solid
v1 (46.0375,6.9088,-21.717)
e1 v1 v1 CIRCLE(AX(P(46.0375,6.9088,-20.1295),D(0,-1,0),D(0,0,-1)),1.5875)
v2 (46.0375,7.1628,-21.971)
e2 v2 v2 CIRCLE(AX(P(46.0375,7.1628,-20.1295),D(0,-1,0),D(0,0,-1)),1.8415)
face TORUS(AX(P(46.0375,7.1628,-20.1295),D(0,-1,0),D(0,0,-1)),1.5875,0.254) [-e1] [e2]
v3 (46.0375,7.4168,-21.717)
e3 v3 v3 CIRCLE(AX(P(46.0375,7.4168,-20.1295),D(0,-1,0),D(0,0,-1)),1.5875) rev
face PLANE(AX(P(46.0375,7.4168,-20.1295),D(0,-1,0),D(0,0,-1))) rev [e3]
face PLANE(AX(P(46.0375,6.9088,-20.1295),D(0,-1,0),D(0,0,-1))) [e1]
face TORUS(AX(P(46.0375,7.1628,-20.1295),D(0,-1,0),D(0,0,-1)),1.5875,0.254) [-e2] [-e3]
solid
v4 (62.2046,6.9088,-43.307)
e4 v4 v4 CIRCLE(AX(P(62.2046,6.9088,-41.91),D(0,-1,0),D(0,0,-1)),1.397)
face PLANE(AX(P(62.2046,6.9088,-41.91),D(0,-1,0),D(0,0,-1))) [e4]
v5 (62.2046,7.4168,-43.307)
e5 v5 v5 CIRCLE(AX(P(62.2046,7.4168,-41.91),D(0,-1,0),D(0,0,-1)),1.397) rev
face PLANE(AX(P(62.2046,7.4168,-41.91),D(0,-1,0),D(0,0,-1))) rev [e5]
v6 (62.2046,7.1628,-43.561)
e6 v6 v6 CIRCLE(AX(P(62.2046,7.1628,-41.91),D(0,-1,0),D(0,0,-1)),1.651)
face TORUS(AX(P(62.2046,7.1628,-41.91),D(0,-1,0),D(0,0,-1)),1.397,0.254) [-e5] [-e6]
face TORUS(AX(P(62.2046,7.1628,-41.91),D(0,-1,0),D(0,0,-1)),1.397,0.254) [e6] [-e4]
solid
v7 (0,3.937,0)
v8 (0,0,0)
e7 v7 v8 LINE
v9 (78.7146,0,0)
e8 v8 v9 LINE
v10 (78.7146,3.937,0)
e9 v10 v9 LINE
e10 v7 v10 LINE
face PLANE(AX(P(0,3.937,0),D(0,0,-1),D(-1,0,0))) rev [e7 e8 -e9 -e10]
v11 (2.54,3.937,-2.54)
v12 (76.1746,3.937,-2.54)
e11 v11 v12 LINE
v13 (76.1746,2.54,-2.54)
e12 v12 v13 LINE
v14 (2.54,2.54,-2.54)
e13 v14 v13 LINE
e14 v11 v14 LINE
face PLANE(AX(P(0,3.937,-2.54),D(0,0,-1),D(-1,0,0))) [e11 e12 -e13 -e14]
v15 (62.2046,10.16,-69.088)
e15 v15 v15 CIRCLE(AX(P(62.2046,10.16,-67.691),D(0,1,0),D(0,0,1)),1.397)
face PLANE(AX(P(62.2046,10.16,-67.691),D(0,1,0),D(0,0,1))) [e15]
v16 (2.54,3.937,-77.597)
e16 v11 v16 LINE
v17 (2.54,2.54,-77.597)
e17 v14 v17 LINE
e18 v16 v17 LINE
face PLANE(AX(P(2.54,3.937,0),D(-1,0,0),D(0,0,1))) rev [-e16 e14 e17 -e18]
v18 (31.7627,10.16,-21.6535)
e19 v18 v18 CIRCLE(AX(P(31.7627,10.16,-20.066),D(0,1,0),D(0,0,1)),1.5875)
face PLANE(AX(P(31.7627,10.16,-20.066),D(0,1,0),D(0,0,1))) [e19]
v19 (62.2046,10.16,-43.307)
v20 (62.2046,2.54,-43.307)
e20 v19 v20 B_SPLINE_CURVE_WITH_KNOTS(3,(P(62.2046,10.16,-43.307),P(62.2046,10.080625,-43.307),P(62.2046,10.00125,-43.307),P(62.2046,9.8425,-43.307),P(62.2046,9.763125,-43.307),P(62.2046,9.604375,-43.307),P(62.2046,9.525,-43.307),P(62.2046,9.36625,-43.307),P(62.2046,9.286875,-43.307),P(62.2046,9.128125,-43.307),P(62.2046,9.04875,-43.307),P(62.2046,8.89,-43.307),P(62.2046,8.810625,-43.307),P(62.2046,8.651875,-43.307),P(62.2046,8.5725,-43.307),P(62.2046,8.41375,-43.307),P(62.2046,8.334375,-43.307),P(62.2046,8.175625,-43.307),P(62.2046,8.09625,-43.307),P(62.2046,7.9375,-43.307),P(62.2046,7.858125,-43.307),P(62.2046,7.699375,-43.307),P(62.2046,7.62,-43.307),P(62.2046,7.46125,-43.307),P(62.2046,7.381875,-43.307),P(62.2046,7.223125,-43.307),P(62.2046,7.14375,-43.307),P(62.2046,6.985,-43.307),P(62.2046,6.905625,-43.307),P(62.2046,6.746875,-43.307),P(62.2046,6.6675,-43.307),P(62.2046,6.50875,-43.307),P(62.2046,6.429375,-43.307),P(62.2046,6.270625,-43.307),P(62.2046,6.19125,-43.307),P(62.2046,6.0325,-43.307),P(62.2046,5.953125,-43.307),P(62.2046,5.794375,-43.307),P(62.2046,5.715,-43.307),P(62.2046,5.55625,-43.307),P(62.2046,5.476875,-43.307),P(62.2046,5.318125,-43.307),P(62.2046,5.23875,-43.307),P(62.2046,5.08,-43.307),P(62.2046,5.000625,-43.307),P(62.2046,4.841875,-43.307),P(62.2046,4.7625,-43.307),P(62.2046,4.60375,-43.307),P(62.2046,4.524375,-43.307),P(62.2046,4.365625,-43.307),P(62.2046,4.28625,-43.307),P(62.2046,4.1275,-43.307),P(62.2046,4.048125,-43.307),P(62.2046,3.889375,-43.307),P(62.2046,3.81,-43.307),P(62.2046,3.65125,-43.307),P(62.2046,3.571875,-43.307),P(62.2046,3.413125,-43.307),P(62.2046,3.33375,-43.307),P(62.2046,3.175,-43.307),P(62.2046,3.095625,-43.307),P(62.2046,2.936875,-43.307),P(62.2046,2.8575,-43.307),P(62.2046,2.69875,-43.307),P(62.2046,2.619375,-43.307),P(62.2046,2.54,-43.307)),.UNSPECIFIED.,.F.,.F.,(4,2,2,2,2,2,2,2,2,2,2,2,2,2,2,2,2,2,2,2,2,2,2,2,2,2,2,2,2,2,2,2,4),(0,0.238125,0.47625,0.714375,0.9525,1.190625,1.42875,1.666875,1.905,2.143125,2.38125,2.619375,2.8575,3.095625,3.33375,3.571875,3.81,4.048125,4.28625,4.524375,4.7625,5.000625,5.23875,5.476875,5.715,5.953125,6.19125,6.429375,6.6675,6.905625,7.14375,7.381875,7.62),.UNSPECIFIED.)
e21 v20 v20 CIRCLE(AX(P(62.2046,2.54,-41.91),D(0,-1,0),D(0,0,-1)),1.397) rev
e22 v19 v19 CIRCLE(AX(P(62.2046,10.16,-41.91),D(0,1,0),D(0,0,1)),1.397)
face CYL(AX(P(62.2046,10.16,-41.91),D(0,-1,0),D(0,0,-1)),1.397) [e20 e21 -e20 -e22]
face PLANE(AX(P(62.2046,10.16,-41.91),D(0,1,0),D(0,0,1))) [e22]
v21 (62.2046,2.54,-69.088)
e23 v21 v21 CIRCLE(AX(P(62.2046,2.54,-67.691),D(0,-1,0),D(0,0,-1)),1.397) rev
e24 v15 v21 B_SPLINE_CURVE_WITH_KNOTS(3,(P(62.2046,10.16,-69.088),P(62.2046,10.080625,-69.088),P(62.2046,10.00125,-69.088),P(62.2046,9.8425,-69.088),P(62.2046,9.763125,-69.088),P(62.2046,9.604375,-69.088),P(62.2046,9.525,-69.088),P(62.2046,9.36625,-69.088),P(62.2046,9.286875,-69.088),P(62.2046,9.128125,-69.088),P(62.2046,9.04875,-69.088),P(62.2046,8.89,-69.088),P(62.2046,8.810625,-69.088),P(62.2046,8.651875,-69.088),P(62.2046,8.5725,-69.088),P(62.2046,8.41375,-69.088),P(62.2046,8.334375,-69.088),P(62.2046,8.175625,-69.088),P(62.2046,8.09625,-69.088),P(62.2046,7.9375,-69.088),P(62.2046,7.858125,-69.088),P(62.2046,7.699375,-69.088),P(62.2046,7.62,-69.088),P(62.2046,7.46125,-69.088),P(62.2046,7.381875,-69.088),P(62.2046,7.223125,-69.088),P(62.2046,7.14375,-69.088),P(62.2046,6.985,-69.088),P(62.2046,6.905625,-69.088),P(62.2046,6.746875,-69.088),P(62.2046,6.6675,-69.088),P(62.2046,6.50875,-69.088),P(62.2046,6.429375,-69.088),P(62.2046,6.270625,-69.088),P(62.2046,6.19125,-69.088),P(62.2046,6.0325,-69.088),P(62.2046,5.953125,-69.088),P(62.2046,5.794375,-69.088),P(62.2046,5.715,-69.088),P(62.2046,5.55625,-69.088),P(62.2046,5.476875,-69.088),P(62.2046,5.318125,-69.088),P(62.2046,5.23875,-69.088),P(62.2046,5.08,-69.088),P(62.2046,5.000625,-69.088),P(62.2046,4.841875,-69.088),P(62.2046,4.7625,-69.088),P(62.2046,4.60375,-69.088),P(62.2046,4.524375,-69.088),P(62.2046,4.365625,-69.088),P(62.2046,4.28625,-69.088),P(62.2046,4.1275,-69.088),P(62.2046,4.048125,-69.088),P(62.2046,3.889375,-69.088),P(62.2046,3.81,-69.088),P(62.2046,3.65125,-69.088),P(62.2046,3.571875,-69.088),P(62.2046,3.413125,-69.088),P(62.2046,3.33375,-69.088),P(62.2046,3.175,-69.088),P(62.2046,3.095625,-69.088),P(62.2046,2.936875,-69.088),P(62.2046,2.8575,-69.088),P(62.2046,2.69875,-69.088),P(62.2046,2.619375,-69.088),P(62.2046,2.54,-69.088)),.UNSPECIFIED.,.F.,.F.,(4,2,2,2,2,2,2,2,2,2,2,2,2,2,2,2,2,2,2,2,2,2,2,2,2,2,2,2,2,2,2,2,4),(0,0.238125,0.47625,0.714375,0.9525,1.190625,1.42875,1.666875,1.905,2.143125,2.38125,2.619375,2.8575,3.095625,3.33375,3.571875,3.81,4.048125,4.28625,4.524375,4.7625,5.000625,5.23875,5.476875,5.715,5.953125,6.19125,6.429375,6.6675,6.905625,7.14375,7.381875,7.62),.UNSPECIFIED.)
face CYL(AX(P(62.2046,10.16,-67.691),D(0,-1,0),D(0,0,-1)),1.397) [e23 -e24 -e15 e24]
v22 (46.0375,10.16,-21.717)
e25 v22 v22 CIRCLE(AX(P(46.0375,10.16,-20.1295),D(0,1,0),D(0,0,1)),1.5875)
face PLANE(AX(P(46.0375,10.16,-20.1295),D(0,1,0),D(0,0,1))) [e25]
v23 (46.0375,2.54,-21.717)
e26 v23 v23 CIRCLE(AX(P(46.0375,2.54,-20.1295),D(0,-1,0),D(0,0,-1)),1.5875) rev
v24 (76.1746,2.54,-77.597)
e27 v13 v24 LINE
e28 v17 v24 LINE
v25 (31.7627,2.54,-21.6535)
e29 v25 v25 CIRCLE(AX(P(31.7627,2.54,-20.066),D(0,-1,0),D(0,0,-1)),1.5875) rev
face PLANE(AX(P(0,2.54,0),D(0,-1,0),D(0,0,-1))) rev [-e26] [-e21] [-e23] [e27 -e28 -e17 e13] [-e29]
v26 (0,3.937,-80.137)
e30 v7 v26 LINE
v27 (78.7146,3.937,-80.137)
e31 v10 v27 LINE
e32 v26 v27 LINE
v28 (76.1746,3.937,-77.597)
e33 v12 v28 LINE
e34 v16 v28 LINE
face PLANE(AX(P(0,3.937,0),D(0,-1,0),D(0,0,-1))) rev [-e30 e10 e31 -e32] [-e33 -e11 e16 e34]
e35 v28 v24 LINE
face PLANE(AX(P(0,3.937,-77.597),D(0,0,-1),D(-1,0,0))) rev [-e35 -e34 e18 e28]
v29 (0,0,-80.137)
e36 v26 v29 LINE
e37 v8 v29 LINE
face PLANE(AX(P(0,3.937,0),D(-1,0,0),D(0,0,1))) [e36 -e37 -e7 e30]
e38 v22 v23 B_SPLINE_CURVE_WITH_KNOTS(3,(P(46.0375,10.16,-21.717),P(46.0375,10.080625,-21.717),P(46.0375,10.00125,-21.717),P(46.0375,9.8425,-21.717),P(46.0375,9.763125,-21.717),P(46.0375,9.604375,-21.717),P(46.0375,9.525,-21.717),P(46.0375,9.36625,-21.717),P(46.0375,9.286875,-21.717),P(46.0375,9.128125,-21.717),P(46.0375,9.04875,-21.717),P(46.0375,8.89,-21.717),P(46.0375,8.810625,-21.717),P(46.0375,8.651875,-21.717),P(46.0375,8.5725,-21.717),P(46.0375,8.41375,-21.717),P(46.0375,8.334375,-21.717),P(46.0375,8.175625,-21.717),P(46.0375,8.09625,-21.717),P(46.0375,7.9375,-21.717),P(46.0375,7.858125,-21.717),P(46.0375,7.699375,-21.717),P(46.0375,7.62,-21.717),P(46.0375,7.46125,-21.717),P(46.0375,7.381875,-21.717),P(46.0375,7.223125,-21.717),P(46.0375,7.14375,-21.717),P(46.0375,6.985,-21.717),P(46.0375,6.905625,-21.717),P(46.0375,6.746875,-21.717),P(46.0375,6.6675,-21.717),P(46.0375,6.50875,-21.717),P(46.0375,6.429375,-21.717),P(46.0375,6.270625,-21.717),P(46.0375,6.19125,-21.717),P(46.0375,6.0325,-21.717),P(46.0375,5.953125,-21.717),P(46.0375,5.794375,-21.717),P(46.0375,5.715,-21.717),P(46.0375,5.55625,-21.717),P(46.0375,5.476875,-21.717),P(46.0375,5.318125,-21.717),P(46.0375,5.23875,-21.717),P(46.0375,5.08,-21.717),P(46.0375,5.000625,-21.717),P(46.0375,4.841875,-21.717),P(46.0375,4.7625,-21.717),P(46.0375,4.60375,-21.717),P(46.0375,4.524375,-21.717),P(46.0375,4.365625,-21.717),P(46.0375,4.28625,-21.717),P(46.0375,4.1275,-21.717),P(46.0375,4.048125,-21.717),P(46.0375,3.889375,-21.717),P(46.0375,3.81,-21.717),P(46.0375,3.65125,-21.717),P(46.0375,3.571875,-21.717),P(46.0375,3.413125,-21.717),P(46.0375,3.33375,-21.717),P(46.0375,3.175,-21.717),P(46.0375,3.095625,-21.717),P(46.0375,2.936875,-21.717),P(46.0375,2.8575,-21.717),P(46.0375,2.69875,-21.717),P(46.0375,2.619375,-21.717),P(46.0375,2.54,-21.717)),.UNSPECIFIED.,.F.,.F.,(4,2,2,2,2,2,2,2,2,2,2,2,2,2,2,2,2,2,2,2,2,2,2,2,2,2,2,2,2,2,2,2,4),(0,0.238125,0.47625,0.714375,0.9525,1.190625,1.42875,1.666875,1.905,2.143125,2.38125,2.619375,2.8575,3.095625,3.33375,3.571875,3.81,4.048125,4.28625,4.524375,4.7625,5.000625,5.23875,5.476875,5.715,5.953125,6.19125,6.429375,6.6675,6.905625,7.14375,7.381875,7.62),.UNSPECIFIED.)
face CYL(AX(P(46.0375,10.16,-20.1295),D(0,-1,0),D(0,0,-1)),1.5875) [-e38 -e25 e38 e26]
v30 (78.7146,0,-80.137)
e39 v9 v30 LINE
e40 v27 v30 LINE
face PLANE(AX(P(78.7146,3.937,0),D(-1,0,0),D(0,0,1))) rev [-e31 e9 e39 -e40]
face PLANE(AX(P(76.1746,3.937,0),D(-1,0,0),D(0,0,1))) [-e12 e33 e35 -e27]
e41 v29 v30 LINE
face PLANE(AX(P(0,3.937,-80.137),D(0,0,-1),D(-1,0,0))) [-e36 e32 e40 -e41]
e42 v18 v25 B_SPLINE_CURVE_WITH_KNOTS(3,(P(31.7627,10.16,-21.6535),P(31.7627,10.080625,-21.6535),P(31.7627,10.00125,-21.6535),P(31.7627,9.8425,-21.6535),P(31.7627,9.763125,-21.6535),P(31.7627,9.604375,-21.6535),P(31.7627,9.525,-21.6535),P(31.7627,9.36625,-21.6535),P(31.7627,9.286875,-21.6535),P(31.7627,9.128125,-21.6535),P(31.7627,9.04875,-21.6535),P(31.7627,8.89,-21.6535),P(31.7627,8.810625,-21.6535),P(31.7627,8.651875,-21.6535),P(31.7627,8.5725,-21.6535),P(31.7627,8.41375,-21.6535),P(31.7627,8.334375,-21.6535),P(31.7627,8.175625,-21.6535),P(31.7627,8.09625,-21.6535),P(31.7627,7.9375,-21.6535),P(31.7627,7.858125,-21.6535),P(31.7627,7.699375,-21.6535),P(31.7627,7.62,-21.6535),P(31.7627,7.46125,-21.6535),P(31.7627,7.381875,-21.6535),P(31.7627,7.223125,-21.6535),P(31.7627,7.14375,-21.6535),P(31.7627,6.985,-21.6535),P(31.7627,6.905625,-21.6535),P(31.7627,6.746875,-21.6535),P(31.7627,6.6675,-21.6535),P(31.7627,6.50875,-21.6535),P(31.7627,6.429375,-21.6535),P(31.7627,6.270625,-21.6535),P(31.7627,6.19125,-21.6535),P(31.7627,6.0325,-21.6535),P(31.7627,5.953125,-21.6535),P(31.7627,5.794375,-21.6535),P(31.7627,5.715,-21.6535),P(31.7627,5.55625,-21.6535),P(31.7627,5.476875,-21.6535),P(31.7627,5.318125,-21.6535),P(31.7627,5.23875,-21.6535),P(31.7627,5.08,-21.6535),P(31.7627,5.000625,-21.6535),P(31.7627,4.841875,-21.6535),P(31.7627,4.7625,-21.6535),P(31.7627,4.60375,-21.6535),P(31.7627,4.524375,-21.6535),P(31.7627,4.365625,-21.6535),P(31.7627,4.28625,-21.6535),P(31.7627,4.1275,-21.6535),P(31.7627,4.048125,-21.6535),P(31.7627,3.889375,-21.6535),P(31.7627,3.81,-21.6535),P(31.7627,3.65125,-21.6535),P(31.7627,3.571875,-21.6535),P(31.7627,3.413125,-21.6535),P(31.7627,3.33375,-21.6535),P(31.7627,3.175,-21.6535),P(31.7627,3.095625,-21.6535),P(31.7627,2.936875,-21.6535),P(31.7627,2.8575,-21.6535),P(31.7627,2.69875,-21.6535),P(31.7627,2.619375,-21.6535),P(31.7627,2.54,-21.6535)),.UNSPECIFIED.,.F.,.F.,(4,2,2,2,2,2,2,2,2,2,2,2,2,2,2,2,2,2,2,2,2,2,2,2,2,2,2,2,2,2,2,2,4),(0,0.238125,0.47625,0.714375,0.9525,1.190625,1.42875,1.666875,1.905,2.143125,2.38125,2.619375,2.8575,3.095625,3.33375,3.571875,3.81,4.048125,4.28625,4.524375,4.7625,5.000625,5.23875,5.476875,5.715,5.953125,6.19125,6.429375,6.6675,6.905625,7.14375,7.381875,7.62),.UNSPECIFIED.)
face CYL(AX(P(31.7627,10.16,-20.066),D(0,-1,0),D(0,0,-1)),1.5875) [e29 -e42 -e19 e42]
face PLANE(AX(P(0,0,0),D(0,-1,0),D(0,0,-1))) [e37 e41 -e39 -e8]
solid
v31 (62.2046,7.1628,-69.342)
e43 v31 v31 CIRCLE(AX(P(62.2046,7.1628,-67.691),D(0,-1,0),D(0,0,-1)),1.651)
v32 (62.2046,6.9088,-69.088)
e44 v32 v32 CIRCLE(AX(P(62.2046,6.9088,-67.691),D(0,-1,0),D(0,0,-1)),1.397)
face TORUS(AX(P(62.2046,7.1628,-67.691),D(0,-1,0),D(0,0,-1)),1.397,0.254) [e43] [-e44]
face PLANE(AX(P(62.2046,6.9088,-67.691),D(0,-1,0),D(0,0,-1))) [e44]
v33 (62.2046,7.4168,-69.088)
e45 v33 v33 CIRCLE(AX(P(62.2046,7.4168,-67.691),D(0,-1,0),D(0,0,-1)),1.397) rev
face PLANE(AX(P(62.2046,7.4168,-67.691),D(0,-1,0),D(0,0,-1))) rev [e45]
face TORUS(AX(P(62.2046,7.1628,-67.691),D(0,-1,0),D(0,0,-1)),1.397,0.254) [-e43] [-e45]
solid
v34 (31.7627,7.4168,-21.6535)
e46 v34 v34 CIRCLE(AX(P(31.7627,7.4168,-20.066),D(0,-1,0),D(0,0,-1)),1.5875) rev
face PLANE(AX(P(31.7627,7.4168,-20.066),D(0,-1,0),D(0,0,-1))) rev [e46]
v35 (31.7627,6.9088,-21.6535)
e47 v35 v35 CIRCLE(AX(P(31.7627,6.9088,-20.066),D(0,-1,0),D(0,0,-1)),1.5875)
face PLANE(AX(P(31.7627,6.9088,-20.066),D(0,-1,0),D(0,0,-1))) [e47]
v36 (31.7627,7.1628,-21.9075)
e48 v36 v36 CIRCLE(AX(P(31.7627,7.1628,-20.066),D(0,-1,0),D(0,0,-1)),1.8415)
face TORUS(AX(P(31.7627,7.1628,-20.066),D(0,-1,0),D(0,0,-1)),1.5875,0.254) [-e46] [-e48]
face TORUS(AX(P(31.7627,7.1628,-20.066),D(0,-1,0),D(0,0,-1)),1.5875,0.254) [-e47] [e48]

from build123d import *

# Parameters (mm, degrees)
SKETCH3_W             = 78.7146
SKETCH3_H             = 80.137
BOSS_EXTRUDE1_DEPTH   = 3.937
SHELL1_T              = -2.54
SKETCH4_R             = 1.397
SKETCH4_R_2           = 1.5875
BOSS_EXTRUDE2_DEPTH   = 7.62
SKETCH7_R             = 1.8415
BOSS_EXTRUDE3_DEPTH   = 0.508
BOSS_EXTRUDE3_2_DEPTH = 0.508
SKETCH7_R_2           = 1.651
BOSS_EXTRUDE3_3_DEPTH = 0.508
BOSS_EXTRUDE3_4_DEPTH = 0.508
FILLET1_R             = 0.254
FILLET2_R             = 0.254
FILLET4_R             = 0.254
FILLET5_R             = 0.254


with BuildPart() as part:
    # Sketch3 → Boss-Extrude1 (new body)
    with BuildSketch(Plane(origin=(0, 0, 0), x_dir=(1, 0, 0), z_dir=(0, 1, 0))):
        with Locations((39.3573, 40.0685)):
            Rectangle(SKETCH3_W, SKETCH3_H)
    extrude(amount=BOSS_EXTRUDE1_DEPTH)

    # Shell1
    shell1_openings = [part.faces().sort_by_distance(p)[0] for p in [
        (39.3573, 3.937, -40.0685),
    ]]
    offset(amount=SHELL1_T, openings=shell1_openings, kind=Kind.INTERSECTION)

    # Sketch4 → Boss-Extrude2 (add)
    with BuildSketch(Plane(origin=(0, 2.54, 0), x_dir=(1, 0, 0), z_dir=(0, 1, 0))):
        with Locations(Location((62.2046, 67.691, 0), (0, 0, 90))):
            Circle(SKETCH4_R)
        with Locations(Location((62.2046, 41.91, 0), (0, 0, 90))):
            Circle(SKETCH4_R)
        with Locations(Location((46.0375, 20.1295, 0), (0, 0, 90))):
            Circle(SKETCH4_R_2)
        with Locations(Location((31.7627, 20.066, 0), (0, 0, 90))):
            Circle(SKETCH4_R_2)
    extrude(amount=BOSS_EXTRUDE2_DEPTH)


with BuildPart() as body_2:
    # Sketch7 → Boss-Extrude3 (new body)
    with BuildSketch(Plane(origin=(0, 6.9088, 0), x_dir=(-1, 0, 0), z_dir=(0, -1, 0))):
        with Locations(Location((-31.7627, 20.066, 0), (0, 0, 90))):
            Circle(SKETCH7_R)
    extrude(amount=-BOSS_EXTRUDE3_DEPTH)

    # Fillet2
    fillet2_edges = [body_2.edges().sort_by_distance(p)[0] for p in [
        (31.7627, 6.9088, -18.2245),
        (31.7627, 7.4168, -18.2245),
    ]]
    fillet(fillet2_edges, radius=FILLET2_R - 0.0001)  # a hair under: the kernel refuses the full size


with BuildPart() as body_3:
    # Sketch7 → Boss-Extrude3 2 (new body)
    with BuildSketch(Plane(origin=(0, 6.9088, 0), x_dir=(-1, 0, 0), z_dir=(0, -1, 0))):
        with Locations(Location((-46.0375, 20.1295, 0), (0, 0, 90))):
            Circle(SKETCH7_R)
    extrude(amount=-BOSS_EXTRUDE3_2_DEPTH)

    # Fillet1
    fillet1_edges = [body_3.edges().sort_by_distance(p)[0] for p in [
        (46.0375, 6.9088, -18.288),
        (46.0375, 7.4168, -18.288),
    ]]
    fillet(fillet1_edges, radius=FILLET1_R - 0.0001)  # a hair under: the kernel refuses the full size


with BuildPart() as body_4:
    # Sketch7 → Boss-Extrude3 3 (new body)
    with BuildSketch(Plane(origin=(0, 6.9088, 0), x_dir=(-1, 0, 0), z_dir=(0, -1, 0))):
        with Locations(Location((-62.2046, 41.91, 0), (0, 0, 90))):
            Circle(SKETCH7_R_2)
    extrude(amount=-BOSS_EXTRUDE3_3_DEPTH)

    # Fillet4
    fillet4_edges = [body_4.edges().sort_by_distance(p)[0] for p in [
        (62.2046, 6.9088, -40.259),
        (62.2046, 7.4168, -40.259),
    ]]
    fillet(fillet4_edges, radius=FILLET4_R - 0.0001)  # a hair under: the kernel refuses the full size


with BuildPart() as body_5:
    # Sketch7 → Boss-Extrude3 4 (new body)
    with BuildSketch(Plane(origin=(0, 6.9088, 0), x_dir=(-1, 0, 0), z_dir=(0, -1, 0))):
        with Locations(Location((-62.2046, 67.691, 0), (0, 0, 90))):
            Circle(SKETCH7_R_2)
    extrude(amount=-BOSS_EXTRUDE3_4_DEPTH)

    # Fillet5
    fillet5_edges = [body_5.edges().sort_by_distance(p)[0] for p in [
        (62.2046, 6.9088, -66.04),
        (62.2046, 7.4168, -66.04),
    ]]
    fillet(fillet5_edges, radius=FILLET5_R - 0.0001)  # a hair under: the kernel refuses the full size


solid = Compound([part.part, body_2.part, body_3.part, body_4.part, body_5.part])
